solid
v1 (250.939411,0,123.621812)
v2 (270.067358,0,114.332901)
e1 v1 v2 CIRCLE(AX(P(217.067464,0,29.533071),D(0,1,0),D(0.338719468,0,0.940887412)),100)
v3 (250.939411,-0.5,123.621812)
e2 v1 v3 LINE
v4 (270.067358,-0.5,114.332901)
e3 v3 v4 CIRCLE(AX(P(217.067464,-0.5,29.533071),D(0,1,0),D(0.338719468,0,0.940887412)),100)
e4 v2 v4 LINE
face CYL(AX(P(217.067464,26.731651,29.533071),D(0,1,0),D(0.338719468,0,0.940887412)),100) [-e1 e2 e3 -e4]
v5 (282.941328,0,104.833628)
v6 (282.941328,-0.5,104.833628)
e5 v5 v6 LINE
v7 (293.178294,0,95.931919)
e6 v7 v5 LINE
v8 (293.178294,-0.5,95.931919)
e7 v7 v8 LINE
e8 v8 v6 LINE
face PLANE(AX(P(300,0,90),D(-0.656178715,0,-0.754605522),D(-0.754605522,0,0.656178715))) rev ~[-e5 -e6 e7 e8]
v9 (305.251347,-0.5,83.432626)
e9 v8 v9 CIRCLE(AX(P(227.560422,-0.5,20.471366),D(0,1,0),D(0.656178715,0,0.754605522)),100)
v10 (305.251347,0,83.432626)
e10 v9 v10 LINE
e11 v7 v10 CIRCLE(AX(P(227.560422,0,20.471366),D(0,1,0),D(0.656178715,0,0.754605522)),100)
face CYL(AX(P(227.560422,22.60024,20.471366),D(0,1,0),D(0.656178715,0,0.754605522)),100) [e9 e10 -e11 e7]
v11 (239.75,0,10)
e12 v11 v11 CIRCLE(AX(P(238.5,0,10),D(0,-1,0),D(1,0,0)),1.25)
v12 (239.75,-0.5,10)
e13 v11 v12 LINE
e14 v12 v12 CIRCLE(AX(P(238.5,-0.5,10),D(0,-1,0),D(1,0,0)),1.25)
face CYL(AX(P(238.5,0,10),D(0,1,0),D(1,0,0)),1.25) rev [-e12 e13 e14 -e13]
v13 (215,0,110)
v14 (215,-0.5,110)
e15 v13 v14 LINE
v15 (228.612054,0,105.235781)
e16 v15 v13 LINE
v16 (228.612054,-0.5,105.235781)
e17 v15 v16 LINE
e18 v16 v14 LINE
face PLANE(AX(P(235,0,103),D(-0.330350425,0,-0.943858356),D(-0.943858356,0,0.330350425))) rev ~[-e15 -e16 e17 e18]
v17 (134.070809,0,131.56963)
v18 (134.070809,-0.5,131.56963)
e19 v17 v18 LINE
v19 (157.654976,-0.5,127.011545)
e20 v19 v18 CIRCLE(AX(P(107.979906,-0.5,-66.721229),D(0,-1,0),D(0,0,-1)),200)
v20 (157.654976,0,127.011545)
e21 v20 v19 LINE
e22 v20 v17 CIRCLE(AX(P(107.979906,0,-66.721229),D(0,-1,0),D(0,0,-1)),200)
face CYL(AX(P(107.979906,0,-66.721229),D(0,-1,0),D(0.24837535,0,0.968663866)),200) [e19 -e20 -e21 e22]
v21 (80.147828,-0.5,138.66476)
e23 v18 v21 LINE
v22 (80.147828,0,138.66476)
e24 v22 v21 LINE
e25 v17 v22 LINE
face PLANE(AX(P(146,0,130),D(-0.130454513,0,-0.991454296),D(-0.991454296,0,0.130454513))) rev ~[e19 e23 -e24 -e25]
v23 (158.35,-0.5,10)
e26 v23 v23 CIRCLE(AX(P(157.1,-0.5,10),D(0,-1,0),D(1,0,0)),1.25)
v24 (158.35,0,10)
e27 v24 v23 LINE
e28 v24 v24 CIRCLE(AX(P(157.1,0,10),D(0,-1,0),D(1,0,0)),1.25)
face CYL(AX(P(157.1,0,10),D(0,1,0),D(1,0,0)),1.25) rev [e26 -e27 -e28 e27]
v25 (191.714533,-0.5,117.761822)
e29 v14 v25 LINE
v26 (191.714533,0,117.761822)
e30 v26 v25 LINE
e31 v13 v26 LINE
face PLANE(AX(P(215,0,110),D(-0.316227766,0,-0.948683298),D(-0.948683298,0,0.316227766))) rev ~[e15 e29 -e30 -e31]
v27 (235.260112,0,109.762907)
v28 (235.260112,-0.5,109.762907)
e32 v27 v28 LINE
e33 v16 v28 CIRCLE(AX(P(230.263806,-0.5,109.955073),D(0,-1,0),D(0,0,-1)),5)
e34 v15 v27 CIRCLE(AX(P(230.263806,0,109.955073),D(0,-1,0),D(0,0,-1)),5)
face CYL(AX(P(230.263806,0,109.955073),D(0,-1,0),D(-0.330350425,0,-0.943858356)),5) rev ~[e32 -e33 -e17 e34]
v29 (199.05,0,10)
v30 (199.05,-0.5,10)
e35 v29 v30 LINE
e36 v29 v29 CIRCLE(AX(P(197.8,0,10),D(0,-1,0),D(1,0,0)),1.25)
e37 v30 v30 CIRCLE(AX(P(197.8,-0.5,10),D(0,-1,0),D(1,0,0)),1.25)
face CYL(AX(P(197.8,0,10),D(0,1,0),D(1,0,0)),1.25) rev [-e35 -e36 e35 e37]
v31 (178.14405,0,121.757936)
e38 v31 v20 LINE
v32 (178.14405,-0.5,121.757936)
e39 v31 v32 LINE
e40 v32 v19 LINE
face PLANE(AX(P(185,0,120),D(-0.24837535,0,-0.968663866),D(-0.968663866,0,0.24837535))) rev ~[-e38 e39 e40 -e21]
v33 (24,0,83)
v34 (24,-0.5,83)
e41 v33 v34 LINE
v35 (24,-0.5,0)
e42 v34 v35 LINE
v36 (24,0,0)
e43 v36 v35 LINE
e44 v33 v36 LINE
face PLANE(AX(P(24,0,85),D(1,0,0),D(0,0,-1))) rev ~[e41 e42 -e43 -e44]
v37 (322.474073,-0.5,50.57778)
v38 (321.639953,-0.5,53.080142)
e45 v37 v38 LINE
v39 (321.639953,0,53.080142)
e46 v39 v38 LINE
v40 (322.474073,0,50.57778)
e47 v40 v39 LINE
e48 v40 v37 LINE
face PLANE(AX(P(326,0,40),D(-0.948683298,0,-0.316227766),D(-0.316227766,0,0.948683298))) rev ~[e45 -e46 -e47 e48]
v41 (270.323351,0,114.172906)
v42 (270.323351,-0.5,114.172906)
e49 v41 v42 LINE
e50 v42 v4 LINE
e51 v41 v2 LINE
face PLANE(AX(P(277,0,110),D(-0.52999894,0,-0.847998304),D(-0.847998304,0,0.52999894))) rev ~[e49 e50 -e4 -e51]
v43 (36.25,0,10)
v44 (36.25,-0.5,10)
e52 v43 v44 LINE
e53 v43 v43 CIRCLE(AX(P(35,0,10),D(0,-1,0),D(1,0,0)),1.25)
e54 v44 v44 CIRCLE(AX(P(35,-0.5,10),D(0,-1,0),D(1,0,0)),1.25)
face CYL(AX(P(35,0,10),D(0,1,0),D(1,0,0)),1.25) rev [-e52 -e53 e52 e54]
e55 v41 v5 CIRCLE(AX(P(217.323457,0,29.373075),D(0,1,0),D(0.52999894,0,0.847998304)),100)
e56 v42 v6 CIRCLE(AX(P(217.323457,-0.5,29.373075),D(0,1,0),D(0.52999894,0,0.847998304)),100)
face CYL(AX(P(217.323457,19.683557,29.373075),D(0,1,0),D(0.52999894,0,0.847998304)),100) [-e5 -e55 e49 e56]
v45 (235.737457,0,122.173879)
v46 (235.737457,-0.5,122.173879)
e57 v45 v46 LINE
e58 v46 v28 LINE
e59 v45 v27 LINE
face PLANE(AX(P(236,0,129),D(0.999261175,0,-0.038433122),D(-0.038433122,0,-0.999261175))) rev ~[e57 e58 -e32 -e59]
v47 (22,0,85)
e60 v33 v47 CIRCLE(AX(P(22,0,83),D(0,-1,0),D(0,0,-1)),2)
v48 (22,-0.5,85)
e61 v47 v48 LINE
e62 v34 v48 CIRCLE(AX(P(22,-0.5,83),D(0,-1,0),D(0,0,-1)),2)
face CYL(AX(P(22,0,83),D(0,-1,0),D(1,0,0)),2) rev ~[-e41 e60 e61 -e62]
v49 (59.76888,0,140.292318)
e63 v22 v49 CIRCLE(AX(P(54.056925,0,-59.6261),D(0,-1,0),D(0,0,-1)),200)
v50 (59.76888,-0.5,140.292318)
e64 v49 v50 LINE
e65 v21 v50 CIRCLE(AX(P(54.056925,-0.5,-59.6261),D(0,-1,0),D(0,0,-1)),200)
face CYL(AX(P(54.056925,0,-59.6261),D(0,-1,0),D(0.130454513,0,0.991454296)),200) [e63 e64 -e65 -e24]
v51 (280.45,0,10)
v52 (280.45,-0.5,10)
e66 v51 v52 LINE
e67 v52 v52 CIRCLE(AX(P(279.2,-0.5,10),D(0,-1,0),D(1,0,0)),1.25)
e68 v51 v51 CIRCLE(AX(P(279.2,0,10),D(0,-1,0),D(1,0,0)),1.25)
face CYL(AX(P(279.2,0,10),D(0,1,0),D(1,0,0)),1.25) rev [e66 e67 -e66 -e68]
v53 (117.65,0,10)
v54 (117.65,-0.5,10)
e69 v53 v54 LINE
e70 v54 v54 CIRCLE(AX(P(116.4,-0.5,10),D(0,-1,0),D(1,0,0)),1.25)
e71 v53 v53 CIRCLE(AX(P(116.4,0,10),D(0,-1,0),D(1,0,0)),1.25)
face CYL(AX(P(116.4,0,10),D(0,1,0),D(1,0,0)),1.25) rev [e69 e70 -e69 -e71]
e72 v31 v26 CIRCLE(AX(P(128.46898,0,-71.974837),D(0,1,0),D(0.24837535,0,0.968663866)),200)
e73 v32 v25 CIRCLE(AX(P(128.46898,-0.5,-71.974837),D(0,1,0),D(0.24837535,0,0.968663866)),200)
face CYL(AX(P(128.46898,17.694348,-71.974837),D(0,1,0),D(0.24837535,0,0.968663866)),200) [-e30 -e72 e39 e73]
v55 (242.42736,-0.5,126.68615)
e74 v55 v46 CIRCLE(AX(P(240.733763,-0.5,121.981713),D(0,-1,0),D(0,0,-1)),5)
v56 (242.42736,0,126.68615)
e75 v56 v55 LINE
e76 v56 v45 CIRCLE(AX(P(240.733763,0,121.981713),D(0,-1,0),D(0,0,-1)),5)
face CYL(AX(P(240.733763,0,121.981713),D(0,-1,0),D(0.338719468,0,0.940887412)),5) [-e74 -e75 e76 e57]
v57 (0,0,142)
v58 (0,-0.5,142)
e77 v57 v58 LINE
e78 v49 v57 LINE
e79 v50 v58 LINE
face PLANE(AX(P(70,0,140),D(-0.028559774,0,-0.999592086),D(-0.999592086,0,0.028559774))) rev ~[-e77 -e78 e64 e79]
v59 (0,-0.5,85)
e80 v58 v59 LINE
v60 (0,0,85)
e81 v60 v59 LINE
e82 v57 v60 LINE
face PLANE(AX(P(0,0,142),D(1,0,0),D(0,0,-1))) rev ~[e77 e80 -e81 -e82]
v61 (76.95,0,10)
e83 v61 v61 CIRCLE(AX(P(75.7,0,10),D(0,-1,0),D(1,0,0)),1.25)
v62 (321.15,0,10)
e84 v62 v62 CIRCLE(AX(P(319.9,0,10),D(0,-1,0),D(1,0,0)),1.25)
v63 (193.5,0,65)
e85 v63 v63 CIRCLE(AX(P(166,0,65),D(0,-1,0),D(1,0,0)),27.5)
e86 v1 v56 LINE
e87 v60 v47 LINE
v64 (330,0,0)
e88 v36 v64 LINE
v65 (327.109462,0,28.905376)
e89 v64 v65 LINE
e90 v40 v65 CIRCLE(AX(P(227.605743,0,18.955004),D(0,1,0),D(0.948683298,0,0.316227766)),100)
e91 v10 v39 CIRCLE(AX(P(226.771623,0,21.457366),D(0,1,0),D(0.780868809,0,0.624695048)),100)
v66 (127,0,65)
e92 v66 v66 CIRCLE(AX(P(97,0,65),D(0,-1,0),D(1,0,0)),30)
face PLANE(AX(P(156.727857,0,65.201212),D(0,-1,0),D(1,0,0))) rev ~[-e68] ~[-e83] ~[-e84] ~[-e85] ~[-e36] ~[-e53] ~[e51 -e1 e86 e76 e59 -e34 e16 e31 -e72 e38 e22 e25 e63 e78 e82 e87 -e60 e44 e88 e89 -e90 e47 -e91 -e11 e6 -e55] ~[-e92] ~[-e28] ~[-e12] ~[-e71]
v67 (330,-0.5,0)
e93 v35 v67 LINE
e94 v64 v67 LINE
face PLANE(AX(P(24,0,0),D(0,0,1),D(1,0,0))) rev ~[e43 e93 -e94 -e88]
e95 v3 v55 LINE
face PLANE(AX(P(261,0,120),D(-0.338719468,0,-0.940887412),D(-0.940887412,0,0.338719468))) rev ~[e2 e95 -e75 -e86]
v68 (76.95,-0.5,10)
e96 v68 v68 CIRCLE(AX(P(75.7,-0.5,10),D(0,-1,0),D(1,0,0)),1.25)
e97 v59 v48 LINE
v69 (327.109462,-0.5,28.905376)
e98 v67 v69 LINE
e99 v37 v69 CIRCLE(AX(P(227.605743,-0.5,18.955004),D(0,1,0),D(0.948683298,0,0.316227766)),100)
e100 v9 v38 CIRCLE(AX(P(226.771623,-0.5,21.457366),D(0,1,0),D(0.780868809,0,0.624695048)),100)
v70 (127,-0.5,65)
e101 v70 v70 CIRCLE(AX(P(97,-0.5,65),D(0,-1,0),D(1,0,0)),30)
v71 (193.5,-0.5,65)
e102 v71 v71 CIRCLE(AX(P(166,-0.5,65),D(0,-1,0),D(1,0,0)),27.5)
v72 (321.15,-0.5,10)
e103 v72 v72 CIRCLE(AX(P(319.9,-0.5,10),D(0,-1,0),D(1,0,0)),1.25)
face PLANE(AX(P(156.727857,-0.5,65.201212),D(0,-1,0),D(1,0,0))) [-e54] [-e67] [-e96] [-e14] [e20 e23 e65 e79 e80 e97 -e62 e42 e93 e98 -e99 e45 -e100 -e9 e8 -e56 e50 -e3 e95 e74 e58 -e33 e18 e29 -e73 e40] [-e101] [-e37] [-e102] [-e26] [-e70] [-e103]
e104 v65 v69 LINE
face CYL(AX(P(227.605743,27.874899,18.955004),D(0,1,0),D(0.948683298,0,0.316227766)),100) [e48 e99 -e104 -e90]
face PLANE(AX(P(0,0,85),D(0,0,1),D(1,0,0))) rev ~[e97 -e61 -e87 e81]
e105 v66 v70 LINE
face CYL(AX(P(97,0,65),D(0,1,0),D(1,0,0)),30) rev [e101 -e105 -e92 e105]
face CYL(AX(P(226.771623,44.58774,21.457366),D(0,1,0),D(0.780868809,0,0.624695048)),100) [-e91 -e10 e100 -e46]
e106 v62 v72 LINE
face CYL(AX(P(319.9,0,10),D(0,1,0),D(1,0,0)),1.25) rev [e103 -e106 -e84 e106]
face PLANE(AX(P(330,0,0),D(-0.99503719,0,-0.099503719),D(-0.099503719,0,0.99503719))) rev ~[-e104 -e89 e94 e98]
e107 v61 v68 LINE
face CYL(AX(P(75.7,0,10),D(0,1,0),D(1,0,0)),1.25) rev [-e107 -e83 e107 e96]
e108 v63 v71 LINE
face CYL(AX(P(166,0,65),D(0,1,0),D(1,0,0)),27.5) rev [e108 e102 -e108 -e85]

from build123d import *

# Parameters (mm, degrees)
F0_R        = 1.25
F0_R_2      = 30
F0_R_3      = 27.5
F1_DEPTH    = 0.5
F2_R        = 2
F3_R        = 5
F4_R        = 200
F5_T1_DEPTH = 35.8886959127
F6_T1_DEPTH = 56.2497974387
F6_T3_DEPTH = 89.6754808083
F6_T5_DEPTH = 45.7004795966
F6_T7_DEPTH = 39.8671139621
F6_T9_DEPTH = 53.963301214


# Not quite as in the source:
# - a fillet or chamfer that OpenCascade refuses, or shapes differently, is made with other operations: its cross-section is extruded or revolved along the edge and cut away or added


with BuildPart() as f1:
    # F0 (on Front) → F1 (new body)
    with BuildSketch(Plane.XZ):
        Polygon((24, 85), (24, 0), (330, 0), (326, 40), (316, 70), (300, 90), (277, 110), (261, 120), (236, 129), (235, 103), (215, 110), (185, 120), (146, 130), (70, 140), (0, 142), (0, 85), align=None)
        with Locations((35, 10)):
            Circle(F0_R, mode=Mode.SUBTRACT)
        with Locations((75.7, 10)):
            Circle(F0_R, mode=Mode.SUBTRACT)
        with Locations((116.4, 10)):
            Circle(F0_R, mode=Mode.SUBTRACT)
        with Locations((157.1, 10)):
            Circle(F0_R, mode=Mode.SUBTRACT)
        with Locations((97, 65)):
            Circle(F0_R_2, mode=Mode.SUBTRACT)
        with Locations((197.8, 10)):
            Circle(F0_R, mode=Mode.SUBTRACT)
        with Locations((238.5, 10)):
            Circle(F0_R, mode=Mode.SUBTRACT)
        with Locations((279.2, 10)):
            Circle(F0_R, mode=Mode.SUBTRACT)
        with Locations((319.9, 10)):
            Circle(F0_R, mode=Mode.SUBTRACT)
        with Locations((166, 65)):
            Circle(F0_R_3, mode=Mode.SUBTRACT)
    extrude(amount=F1_DEPTH)

    # F2
    f2_edges = [f1.edges().sort_by_distance(p)[0] for p in [
        (24, -0.25, 85),
    ]]
    fillet(f2_edges, radius=F2_R)

    # F3
    f3_edges = [f1.edges().sort_by_distance(p)[0] for p in [
        (235, -0.25, 103),
        (236, -0.25, 129),
    ]]
    fillet(f3_edges, radius=F3_R)

    # F4
    f4_edges = [f1.edges().sort_by_distance(p)[0] for p in [
        (70, -0.25, 140),
        (146, -0.25, 130),
    ]]
    fillet(f4_edges, radius=F4_R)

    # F5: fillet of radius 200 on 1 edges, made by hand

    # F5_s2 → F5_t1 (cut)
    with BuildSketch(Plane.XZ.offset(-17.6943479563)):
        with BuildLine():
            ThreePointArc((178.1440498006, 121.7579359486), (184.9646346256, 119.8799020084), (191.7145329504, 117.7618223499))
            Line((191.7145329504, 117.7618223499), (185, 120))
            Line((185, 120), (178.1440498006, 121.7579359486))
        make_face()
    extrude(amount=F5_T1_DEPTH, mode=Mode.SUBTRACT)

    # F6: fillet of radius 100 on 5 edges, made by hand

    # F6_s2 → F6_t1 (cut)
    with BuildSketch(Plane.XZ.offset(-27.8748987193)):
        with BuildLine():
            ThreePointArc((322.47407322, 50.57778034), (325.3940178786, 39.8703898792), (327.109462436, 28.9053756404))
            Line((327.109462436, 28.9053756404), (326, 40))
            Line((326, 40), (322.47407322, 50.57778034))
        make_face()
    extrude(amount=F6_T1_DEPTH, mode=Mode.SUBTRACT)

    # F6_s4 → F6_t3 (cut)
    with BuildSketch(Plane.XZ.offset(-44.5877404042)):
        with BuildLine():
            ThreePointArc((304.8585037552, 83.9268703061), (314.6138472293, 69.2458956516), (321.6399526159, 53.0801421523))
            Line((321.6399526159, 53.0801421523), (316, 70))
            Line((316, 70), (304.8585037552, 83.9268703061))
        make_face()
    extrude(amount=F6_T3_DEPTH, mode=Mode.SUBTRACT)

    # F6_s6 → F6_t5 (cut)
    with BuildSketch(Plane.XZ.offset(-22.6002397983)):
        with BuildLine():
            ThreePointArc((293.1782936984, 95.9319185231), (299.7058017999, 89.7176239908), (305.6473031502, 82.9408710622))
            Line((305.6473031502, 82.9408710622), (300, 90))
            Line((300, 90), (293.1782936984, 95.9319185231))
        make_face()
    extrude(amount=F6_T5_DEPTH, mode=Mode.SUBTRACT)

    # F6_s8 → F6_t7 (cut)
    with BuildSketch(Plane.XZ.offset(-19.683556981)):
        with BuildLine():
            ThreePointArc((270.3233508253, 114.1729057342), (276.8158857708, 109.7512495983), (282.9413283175, 104.83362755))
            Line((282.9413283175, 104.83362755), (277, 110))
            Line((277, 110), (270.3233508253, 114.1729057342))
        make_face()
    extrude(amount=F6_T7_DEPTH, mode=Mode.SUBTRACT)

    # F6_s10 → F6_t9 (cut)
    with BuildSketch(Plane.XZ.offset(-26.731650607)):
        with BuildLine():
            ThreePointArc((250.9394105782, 123.6218121919), (260.7509863663, 119.487225172), (270.0673577512, 114.3329014055))
            Line((270.0673577512, 114.3329014055), (261, 120))
            Line((261, 120), (250.9394105782, 123.6218121919))
        make_face()
    extrude(amount=F6_T9_DEPTH, mode=Mode.SUBTRACT)


solid = f1.part
